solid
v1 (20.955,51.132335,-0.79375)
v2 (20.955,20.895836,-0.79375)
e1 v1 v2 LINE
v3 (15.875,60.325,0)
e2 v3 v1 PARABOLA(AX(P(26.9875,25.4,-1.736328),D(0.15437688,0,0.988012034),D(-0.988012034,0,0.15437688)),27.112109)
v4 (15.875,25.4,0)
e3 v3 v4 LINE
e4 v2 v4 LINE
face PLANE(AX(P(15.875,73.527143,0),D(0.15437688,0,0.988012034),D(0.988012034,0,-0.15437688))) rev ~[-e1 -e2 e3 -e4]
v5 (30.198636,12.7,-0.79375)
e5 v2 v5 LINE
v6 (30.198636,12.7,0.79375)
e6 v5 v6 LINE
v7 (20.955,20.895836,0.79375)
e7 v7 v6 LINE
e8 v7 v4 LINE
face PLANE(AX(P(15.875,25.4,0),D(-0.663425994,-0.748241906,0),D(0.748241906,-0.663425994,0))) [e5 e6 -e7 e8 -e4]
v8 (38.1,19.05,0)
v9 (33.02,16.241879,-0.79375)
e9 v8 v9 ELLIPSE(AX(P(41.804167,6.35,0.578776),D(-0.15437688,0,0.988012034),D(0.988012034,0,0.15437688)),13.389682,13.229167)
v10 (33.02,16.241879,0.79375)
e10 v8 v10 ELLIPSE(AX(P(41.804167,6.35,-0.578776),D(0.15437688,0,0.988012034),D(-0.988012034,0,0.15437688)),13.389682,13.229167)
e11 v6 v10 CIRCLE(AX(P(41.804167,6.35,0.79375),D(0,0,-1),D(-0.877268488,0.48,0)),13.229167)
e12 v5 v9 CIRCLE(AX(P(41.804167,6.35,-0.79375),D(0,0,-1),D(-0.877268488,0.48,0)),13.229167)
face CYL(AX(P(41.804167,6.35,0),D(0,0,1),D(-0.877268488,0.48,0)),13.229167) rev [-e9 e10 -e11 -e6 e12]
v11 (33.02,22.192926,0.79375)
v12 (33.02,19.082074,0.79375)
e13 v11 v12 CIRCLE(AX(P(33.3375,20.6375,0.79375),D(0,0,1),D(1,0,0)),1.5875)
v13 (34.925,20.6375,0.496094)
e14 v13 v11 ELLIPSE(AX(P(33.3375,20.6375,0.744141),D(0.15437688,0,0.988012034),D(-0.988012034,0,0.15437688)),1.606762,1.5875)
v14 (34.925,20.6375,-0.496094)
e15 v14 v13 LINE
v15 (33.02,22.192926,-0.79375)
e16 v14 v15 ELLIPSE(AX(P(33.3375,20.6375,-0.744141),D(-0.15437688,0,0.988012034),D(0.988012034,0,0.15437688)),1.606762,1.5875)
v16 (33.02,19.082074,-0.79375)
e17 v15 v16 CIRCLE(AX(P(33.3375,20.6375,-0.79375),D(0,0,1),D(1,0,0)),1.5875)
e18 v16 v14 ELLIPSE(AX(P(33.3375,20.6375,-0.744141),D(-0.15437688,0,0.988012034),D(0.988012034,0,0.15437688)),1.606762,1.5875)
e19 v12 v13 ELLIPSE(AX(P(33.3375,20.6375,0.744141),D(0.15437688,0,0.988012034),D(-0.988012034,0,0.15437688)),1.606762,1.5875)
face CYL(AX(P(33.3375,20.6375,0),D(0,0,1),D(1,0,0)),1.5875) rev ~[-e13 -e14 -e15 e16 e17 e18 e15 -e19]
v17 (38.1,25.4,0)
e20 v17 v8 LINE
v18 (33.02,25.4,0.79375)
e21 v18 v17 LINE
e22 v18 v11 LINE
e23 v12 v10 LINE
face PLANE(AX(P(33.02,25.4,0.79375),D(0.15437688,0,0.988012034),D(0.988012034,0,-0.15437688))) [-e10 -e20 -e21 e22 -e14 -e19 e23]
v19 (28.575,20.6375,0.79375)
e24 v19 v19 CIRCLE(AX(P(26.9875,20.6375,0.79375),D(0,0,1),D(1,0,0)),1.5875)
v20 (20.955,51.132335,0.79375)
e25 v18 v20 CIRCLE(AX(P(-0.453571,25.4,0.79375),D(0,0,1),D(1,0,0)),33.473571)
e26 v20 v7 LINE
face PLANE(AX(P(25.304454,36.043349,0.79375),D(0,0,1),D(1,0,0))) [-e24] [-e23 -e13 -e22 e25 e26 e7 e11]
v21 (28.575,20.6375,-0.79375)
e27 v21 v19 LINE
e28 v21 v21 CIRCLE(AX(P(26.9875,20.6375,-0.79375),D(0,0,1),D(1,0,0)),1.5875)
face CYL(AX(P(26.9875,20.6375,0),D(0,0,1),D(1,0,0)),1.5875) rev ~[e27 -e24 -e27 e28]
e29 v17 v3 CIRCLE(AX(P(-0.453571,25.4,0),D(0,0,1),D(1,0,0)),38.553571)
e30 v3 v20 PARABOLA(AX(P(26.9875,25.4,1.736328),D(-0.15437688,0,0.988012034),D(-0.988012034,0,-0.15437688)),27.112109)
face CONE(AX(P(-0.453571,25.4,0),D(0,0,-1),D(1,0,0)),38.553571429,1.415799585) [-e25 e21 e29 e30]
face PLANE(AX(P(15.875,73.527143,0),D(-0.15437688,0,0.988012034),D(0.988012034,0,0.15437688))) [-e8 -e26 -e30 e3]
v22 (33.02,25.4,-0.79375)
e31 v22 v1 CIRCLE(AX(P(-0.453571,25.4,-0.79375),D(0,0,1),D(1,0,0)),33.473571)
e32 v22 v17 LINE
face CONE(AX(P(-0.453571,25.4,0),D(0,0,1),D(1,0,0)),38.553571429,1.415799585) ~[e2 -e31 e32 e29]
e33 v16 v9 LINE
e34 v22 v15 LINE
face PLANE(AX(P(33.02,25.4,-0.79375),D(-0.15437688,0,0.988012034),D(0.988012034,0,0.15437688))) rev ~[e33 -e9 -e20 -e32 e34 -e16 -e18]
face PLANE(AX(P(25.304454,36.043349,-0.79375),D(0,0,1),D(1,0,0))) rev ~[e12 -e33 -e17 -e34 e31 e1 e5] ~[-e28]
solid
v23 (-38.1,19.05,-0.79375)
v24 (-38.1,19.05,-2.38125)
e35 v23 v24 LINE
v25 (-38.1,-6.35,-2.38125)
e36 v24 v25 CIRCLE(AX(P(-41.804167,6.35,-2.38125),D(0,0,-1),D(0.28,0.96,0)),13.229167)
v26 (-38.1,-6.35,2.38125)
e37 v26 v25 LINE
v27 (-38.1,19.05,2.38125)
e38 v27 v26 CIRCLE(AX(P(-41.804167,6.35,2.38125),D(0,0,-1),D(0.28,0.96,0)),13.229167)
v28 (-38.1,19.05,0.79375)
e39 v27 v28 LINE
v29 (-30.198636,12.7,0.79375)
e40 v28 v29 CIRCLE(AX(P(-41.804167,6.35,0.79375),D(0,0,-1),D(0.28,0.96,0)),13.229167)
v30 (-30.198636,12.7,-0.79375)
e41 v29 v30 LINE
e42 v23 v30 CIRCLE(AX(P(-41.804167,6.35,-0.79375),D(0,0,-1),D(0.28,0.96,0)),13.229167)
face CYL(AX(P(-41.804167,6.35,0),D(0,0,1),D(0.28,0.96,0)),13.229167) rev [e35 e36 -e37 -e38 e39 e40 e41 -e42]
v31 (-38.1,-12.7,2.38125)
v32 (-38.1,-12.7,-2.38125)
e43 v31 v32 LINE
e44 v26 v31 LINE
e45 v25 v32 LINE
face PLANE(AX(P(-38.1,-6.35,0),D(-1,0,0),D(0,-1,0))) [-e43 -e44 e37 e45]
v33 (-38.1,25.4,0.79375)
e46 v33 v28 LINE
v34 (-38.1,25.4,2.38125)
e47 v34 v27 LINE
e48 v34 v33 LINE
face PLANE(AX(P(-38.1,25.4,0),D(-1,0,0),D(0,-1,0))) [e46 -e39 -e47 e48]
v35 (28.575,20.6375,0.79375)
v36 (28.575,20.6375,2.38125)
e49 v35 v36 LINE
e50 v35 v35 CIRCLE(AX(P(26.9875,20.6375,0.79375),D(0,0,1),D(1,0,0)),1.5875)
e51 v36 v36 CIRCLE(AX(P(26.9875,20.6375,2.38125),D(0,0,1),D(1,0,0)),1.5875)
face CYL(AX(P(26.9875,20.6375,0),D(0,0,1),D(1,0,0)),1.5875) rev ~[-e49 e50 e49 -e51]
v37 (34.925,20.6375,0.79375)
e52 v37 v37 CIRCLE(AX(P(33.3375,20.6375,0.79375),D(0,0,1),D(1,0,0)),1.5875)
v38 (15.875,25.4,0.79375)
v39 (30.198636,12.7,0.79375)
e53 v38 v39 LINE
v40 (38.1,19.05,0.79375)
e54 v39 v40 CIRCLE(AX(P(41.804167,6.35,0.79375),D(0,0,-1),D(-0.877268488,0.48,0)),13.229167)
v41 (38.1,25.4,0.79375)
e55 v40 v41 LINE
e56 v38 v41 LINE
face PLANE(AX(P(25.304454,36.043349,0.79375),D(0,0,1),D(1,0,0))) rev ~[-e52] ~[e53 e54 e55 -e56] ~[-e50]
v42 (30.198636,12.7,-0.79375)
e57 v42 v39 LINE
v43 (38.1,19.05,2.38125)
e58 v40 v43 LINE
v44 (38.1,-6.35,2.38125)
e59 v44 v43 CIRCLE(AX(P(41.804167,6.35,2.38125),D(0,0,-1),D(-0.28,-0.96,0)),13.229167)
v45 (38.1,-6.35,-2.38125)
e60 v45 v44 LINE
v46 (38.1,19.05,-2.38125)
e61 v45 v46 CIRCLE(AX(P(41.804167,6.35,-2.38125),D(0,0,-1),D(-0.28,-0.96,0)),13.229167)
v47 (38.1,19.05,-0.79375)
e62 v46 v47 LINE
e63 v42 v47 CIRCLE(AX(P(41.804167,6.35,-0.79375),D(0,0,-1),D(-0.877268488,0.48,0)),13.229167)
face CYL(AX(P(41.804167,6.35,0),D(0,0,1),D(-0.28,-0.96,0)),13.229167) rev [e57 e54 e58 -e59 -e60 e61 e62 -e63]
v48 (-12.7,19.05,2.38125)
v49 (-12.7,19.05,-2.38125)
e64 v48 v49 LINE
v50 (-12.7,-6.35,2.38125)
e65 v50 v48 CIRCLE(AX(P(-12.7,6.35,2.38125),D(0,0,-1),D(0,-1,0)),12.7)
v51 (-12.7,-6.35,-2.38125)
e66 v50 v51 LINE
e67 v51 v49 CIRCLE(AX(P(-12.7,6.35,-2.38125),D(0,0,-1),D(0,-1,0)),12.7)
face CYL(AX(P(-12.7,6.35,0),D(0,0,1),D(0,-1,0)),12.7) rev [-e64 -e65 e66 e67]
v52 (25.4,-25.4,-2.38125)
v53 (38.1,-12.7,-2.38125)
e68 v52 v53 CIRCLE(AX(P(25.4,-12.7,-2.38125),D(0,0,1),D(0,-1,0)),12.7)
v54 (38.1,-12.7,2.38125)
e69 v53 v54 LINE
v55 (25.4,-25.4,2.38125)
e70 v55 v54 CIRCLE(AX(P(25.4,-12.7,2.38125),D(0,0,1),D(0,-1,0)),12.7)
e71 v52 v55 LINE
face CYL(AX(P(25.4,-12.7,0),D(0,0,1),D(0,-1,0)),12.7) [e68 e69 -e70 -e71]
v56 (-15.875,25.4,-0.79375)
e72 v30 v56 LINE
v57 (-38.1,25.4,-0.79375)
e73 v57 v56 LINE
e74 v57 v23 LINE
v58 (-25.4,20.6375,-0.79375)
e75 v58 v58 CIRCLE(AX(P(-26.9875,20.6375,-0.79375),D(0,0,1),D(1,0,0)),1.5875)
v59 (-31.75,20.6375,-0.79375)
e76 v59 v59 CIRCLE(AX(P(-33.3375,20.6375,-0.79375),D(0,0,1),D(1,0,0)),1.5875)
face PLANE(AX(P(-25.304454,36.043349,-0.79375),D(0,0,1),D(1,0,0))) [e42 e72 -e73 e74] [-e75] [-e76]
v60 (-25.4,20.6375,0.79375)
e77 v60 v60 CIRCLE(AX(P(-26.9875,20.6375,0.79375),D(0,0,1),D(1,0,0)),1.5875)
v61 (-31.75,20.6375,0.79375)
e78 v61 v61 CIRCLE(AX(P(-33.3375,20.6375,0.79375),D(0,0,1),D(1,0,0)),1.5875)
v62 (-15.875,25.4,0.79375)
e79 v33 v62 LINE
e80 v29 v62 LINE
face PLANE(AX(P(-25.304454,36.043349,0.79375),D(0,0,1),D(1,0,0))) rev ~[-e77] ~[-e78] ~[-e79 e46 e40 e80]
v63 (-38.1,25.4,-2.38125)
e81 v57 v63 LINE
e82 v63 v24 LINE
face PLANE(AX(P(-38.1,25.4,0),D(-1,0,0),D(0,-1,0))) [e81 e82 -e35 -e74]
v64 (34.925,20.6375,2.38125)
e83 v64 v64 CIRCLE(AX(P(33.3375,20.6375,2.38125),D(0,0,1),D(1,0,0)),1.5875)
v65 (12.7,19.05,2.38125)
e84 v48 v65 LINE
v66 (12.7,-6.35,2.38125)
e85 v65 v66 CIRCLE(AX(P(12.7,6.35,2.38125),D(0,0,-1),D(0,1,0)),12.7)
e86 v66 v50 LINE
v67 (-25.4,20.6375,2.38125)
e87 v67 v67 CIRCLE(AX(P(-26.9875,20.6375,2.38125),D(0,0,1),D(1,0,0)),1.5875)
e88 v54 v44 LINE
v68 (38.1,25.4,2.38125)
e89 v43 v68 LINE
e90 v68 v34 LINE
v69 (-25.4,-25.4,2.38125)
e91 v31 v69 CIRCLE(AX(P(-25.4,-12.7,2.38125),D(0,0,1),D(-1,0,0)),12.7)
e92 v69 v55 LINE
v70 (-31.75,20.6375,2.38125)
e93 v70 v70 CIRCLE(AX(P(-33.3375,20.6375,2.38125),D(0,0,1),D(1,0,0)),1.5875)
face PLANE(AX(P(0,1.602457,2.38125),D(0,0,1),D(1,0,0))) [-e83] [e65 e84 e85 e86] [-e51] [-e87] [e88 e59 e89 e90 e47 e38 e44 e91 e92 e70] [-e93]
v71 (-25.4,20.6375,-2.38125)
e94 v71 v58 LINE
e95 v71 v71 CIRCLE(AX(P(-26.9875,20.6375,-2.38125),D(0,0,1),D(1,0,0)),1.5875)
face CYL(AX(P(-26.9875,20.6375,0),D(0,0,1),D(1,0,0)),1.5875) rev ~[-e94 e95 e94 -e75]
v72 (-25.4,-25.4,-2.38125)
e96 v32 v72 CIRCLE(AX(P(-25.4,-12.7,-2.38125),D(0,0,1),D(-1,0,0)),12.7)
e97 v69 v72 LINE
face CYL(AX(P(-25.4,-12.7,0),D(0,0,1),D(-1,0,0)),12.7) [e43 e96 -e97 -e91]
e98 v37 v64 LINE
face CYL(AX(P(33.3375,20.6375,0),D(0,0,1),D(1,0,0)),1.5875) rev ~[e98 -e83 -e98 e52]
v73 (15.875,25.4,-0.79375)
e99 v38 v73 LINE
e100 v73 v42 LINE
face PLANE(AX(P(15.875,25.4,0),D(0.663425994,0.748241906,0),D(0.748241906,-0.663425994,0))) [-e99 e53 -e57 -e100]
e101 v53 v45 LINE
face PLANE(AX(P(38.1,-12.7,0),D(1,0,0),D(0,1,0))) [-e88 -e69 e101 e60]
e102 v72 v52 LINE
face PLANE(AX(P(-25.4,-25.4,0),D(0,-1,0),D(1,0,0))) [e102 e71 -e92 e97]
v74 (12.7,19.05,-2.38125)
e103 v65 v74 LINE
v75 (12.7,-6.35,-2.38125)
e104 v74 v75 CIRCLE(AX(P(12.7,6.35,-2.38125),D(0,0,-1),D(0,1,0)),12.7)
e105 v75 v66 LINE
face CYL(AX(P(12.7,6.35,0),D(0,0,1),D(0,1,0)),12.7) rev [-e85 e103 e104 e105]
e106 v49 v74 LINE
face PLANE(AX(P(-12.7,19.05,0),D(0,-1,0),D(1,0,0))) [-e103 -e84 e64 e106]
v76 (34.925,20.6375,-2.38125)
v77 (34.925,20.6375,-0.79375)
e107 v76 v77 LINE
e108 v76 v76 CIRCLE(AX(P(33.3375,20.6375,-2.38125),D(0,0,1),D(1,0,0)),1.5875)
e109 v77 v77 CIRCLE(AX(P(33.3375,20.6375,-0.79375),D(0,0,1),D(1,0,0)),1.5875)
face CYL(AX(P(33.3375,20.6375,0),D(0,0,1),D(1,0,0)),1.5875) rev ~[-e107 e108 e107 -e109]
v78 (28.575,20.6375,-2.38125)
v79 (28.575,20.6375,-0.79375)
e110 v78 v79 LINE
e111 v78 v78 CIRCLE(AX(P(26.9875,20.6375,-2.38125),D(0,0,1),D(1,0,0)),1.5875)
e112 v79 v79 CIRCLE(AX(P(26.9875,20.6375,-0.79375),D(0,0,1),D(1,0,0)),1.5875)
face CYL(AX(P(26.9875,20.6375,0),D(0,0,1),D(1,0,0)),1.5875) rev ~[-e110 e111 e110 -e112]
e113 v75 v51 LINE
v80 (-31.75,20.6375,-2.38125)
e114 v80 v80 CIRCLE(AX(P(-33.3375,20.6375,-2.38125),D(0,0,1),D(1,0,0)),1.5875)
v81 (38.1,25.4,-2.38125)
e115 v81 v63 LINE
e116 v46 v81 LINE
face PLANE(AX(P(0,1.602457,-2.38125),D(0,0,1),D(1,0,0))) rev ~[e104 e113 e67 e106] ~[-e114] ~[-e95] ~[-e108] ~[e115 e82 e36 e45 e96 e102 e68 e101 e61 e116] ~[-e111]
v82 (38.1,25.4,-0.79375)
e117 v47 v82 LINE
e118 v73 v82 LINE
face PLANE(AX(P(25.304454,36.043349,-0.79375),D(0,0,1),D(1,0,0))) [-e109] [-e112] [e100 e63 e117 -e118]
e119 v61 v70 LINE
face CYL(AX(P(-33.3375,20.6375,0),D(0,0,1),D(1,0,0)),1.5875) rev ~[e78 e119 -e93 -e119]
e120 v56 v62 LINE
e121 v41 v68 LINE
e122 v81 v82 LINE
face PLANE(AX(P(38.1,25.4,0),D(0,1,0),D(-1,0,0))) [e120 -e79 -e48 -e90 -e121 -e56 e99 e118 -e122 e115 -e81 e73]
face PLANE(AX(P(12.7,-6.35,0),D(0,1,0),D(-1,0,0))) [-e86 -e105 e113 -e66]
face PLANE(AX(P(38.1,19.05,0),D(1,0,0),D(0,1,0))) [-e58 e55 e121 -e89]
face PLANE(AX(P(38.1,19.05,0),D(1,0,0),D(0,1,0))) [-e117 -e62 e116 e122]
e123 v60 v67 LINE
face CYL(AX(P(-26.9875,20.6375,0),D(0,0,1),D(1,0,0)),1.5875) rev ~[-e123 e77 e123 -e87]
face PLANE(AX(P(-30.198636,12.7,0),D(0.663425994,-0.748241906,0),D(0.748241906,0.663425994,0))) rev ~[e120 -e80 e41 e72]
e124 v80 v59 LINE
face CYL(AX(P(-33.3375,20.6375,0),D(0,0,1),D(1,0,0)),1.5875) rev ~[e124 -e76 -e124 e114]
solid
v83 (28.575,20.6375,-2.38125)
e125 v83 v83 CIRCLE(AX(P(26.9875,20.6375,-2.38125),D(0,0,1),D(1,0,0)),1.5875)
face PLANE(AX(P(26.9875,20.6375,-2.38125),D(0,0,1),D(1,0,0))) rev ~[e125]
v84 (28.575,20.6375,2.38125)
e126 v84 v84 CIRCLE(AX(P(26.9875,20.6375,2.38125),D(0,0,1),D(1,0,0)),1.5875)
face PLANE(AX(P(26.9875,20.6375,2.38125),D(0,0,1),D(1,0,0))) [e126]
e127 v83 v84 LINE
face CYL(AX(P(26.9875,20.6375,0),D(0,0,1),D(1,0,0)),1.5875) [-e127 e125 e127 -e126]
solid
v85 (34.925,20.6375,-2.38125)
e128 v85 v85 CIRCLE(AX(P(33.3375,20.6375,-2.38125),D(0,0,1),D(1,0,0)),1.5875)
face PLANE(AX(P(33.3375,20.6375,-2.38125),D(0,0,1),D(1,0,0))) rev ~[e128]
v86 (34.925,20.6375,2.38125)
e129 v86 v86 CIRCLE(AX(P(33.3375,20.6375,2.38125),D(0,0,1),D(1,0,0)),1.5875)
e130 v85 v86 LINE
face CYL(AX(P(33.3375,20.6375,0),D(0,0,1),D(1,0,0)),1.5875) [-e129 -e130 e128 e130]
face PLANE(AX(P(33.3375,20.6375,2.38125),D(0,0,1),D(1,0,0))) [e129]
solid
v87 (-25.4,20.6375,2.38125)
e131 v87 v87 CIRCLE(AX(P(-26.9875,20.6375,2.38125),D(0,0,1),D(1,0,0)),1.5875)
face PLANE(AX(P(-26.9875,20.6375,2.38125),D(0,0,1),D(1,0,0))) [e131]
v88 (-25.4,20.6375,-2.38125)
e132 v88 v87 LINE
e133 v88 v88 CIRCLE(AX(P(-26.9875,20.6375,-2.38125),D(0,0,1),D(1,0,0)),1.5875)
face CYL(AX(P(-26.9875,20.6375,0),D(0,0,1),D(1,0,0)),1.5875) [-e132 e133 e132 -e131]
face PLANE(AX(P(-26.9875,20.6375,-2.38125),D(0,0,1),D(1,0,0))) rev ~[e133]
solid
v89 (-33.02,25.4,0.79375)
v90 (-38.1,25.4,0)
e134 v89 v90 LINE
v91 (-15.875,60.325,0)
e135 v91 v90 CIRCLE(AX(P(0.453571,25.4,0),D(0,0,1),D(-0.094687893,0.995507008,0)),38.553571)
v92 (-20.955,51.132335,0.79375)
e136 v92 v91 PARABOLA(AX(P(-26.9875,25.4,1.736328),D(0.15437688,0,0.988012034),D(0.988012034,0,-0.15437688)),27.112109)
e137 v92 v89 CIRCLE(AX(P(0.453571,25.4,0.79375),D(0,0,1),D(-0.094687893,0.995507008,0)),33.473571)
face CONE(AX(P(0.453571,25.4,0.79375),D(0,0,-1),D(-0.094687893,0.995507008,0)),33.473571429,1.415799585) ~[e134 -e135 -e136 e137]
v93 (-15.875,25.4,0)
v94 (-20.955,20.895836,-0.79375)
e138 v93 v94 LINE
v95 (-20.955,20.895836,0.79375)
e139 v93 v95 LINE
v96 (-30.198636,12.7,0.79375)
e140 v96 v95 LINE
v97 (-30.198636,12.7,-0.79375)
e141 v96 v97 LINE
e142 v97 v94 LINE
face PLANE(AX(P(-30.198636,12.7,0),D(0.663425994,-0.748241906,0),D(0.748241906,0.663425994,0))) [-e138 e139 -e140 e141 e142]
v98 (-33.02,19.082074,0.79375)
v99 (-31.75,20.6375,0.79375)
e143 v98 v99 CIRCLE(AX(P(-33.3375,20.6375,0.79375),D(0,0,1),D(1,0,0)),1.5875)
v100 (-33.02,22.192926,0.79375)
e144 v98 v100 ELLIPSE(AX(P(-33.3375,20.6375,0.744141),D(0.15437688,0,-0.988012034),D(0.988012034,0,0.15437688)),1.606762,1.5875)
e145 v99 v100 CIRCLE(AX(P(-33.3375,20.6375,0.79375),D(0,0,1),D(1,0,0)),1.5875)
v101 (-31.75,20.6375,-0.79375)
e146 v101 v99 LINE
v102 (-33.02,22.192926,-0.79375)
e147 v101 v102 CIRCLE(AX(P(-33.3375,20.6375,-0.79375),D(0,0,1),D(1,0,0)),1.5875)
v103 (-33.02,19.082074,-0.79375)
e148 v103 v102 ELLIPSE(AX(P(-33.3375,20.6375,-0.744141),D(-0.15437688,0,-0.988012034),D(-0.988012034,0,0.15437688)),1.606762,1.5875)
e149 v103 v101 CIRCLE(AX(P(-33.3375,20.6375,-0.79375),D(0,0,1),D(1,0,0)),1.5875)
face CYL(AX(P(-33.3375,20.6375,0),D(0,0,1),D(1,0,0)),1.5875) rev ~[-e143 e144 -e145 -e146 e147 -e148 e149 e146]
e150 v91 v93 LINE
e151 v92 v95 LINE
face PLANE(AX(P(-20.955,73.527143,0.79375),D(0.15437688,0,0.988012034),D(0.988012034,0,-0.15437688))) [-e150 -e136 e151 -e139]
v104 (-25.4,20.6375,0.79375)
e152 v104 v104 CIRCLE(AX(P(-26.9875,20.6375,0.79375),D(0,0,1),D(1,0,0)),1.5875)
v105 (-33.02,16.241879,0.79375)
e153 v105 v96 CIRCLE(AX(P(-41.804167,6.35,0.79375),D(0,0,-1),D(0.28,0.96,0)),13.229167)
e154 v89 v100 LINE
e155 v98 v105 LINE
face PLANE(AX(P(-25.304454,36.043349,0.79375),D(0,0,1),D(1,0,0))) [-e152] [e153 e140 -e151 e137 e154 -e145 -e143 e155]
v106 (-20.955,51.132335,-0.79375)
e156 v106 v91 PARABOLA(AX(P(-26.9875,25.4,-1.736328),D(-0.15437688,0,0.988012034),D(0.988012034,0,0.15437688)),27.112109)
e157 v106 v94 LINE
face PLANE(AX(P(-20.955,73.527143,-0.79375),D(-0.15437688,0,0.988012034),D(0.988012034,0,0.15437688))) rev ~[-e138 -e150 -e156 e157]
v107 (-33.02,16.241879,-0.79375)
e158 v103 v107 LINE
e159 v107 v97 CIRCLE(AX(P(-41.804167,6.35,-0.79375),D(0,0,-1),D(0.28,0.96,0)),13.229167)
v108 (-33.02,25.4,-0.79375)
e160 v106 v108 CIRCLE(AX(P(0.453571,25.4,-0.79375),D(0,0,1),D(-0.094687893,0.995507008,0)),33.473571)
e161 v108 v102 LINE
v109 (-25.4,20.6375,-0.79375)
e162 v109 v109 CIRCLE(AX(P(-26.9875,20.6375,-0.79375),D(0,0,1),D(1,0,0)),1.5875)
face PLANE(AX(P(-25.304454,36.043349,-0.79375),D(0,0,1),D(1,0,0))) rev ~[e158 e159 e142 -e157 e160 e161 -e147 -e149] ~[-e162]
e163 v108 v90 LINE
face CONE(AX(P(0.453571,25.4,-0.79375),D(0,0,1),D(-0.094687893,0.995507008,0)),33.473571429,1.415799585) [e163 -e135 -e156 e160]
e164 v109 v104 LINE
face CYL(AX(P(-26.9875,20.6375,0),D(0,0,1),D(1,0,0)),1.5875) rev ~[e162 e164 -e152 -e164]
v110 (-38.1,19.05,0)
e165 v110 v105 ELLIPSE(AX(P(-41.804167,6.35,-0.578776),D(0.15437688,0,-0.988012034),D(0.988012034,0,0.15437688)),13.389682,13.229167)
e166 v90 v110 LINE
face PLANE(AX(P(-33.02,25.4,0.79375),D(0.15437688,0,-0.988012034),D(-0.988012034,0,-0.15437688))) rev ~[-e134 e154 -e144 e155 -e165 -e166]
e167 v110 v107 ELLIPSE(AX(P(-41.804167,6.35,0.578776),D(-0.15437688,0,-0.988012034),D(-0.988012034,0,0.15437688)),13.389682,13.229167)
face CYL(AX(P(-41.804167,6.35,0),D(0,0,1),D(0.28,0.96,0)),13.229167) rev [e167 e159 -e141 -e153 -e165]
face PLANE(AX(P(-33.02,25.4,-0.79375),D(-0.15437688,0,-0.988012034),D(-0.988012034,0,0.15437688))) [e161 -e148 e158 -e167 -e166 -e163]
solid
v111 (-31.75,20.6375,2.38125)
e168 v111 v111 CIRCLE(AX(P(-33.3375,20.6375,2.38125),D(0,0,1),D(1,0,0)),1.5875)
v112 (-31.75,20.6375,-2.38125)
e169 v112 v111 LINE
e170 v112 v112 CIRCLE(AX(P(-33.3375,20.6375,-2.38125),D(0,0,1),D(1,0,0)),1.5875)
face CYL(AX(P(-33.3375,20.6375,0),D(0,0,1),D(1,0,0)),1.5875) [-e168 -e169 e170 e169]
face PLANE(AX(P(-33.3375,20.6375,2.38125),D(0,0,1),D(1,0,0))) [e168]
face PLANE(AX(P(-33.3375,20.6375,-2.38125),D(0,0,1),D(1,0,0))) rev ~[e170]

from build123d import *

# Parameters (mm, degrees)
F1_DEPTH      = 2.38125
F1_DEPTH_BACK = 2.38125
F3_DEPTH      = 0.79375
F3_DEPTH_BACK = 0.79375
F4_DEPTH      = 0.79375
F4_DEPTH_BACK = 0.79375
F5_R          = 1.5875
F6_DEPTH      = 2.38125
F6_DEPTH_BACK = 2.38125
F7_DEPTH      = 2.38125
F7_DEPTH_BACK = 2.38125
F8_T1_DEPTH   = 61.3292860819
F8_T3_DEPTH   = 19.552143041
F8_T6_ANGLE   = 84.5666435794
F8_2_T1_DEPTH = 61.3292860819
F8_2_T3_DEPTH = 19.552143041
F8_2_T6_ANGLE = 84.5666435794
F9_T1_DEPTH   = 61.3292860819
F9_T3_DEPTH   = 19.552143041
F9_T6_ANGLE   = 84.5666435794
F9_2_T1_DEPTH = 61.3292860819
F9_2_T3_DEPTH = 19.552143041
F9_2_T6_ANGLE = 84.5666435794


# Not quite as in the source:
# - a fillet or chamfer that OpenCascade refuses, or shapes differently, is made with other operations: its cross-section is extruded or revolved along the edge and cut away or added


with BuildPart() as f1:
    # F0 (on Top) → F1 (new body, two sides)
    with BuildSketch(Plane.XY) as f1_sk:
        with BuildLine():
            Line((-25.4, -25.4), (25.4, -25.4))
            ThreePointArc((25.4, -25.4), (34.3802561211, -21.6802561211), (38.1, -12.7))
            Line((38.1, -12.7), (38.1, -6.35))
            ThreePointArc((38.1, -6.35), (28.575, 6.35), (38.1, 19.05))
            Line((38.1, 19.05), (38.1, 25.4))
            Line((38.1, 25.4), (-38.1, 25.4))
            Line((-38.1, 25.4), (-38.1, 19.05))
            ThreePointArc((-38.1, 19.05), (-28.575, 6.35), (-38.1, -6.35))
            Line((-38.1, -6.35), (-38.1, -12.7))
            ThreePointArc((-38.1, -12.7), (-34.3802561211, -21.6802561211), (-25.4, -25.4))
        make_face()
        with BuildLine():
            Line((12.7, -6.35), (-12.7, -6.35))
            ThreePointArc((-12.7, -6.35), (-25.4, 6.35), (-12.7, 19.05))
            Line((-12.7, 19.05), (12.7, 19.05))
            ThreePointArc((12.7, 19.05), (25.4, 6.35), (12.7, -6.35))
        make_face(mode=Mode.SUBTRACT)
    extrude(amount=F1_DEPTH)
    extrude(f1_sk.sketch, amount=-F1_DEPTH_BACK)

    # F2 (on Top) → F3 (cut, two sides)
    with BuildSketch(Plane.XY) as f3_sk:
        with BuildLine():
            ThreePointArc((-15.875, 60.325), (-32.0725920002, 46.0984676365), (-38.1, 25.4))
            Line((-38.1, 25.4), (-38.1, 19.05))
            ThreePointArc((-38.1, 19.05), (-33.5169876558, 16.661814328), (-30.1986356278, 12.7))
            Line((-30.1986356278, 12.7), (-15.875, 25.4))
            Line((-15.875, 25.4), (-15.875, 60.325))
        make_face()
        with BuildLine():
            Line((15.875, 60.325), (15.875, 25.4))
            Line((15.875, 25.4), (30.1986356278, 12.7))
            ThreePointArc((30.1986356278, 12.7), (33.5169876558, 16.661814328), (38.1, 19.05))
            Line((38.1, 19.05), (38.1, 25.4))
            ThreePointArc((38.1, 25.4), (32.0725920002, 46.0984676365), (15.875, 60.325))
        make_face()
    extrude(amount=F3_DEPTH, mode=Mode.SUBTRACT)
    extrude(f3_sk.sketch, amount=-F3_DEPTH_BACK, mode=Mode.SUBTRACT)


with BuildPart() as f4:
    # F2 (on Top) → F4 (new body, two sides)
    with BuildSketch(Plane.XY) as f4_sk:
        with BuildLine():
            Line((15.875, 60.325), (15.875, 25.4))
            Line((15.875, 25.4), (30.1986356278, 12.7))
            ThreePointArc((30.1986356278, 12.7), (33.5169876558, 16.661814328), (38.1, 19.05))
            Line((38.1, 19.05), (38.1, 25.4))
            ThreePointArc((38.1, 25.4), (32.0725920002, 46.0984676365), (15.875, 60.325))
        make_face()
    extrude(amount=F4_DEPTH)
    extrude(f4_sk.sketch, amount=-F4_DEPTH_BACK)


with BuildPart() as f4b:
    # F2 (on Top) → F4, piece 2 (new body, two sides)
    with BuildSketch(Plane.XY) as f4_2_sk:
        with BuildLine():
            ThreePointArc((-15.875, 60.325), (-32.0725920002, 46.0984676365), (-38.1, 25.4))
            Line((-38.1, 25.4), (-38.1, 19.05))
            ThreePointArc((-38.1, 19.05), (-33.5169876558, 16.661814328), (-30.1986356278, 12.7))
            Line((-30.1986356278, 12.7), (-15.875, 25.4))
            Line((-15.875, 25.4), (-15.875, 60.325))
        make_face()
    extrude(amount=F4_DEPTH)
    extrude(f4_2_sk.sketch, amount=-F4_DEPTH_BACK)


with BuildPart() as f6_tool:
    # F5 (on Top) → F6 (new body, two sides)
    with BuildSketch(Plane.XY) as f6_sk:
        with Locations((-26.9875, 20.6375)):
            Circle(F5_R)
        with Locations((26.9875, 20.6375)):
            Circle(F5_R)
        with Locations((-33.3375, 20.6375)):
            Circle(F5_R)
        with Locations((33.3375, 20.6375)):
            Circle(F5_R)
    extrude(amount=F6_DEPTH)
    extrude(f6_sk.sketch, amount=-F6_DEPTH_BACK)


with BuildPart() as f1_1:
    add(f1.part)

    # F6: cut by f6_tool
    add(f6_tool.part, mode=Mode.SUBTRACT)


with BuildPart() as f4_1:
    add(f4.part)

    # F6: cut by f6_tool
    add(f6_tool.part, mode=Mode.SUBTRACT)

    # F8: chamfer of 0.79375 x 5.08 on 2 edges, made by hand

    # F8_s2 → F8_t1 (cut)
    with BuildSketch(Plane.XZ.offset(-73.527143041)):
        Polygon((15.875, 0), (20.955, 0.79375), (15.875, 0.79375), align=None)
    extrude(amount=F8_T1_DEPTH, mode=Mode.SUBTRACT)

    # F8_s4 → F8_t3 (cut)
    with BuildSketch(Plane.XZ.offset(-25.4)):
        Polygon((33.02, 0.79375), (38.1, 0), (38.1, 0.79375), align=None)
    extrude(amount=F8_T3_DEPTH, mode=Mode.SUBTRACT)

    # F8_s5 → F8_t6 (revolve, cut)
    with BuildSketch(Plane.XZ.offset(-25.4)):
        Polygon((38.1, 0), (33.02, 0.79375), (38.1, 0.79375), align=None)
    revolve(axis=Axis((-0.4535714286, 25.4, 0.79375), (0, 0, 1)), revolution_arc=F8_T6_ANGLE, mode=Mode.SUBTRACT)

    # F9: chamfer of 0.79375 x 5.08 on 2 edges, made by hand

    # F9_s2 → F9_t1 (cut)
    with BuildSketch(Plane.XZ.offset(-73.527143041)):
        Polygon((15.875, 0), (20.955, -0.79375), (15.875, -0.79375), align=None)
    extrude(amount=F9_T1_DEPTH, mode=Mode.SUBTRACT)

    # F9_s4 → F9_t3 (cut)
    with BuildSketch(Plane.XZ.offset(-25.4)):
        Polygon((33.02, -0.79375), (38.1, 0), (38.1, -0.79375), align=None)
    extrude(amount=F9_T3_DEPTH, mode=Mode.SUBTRACT)

    # F9_s5 → F9_t6 (revolve, cut)
    with BuildSketch(Plane.XZ.offset(-25.4)):
        Polygon((38.1, 0), (33.02, -0.79375), (38.1, -0.79375), align=None)
    revolve(axis=Axis((-0.4535714286, 25.4, -0.79375), (0, 0, 1)), revolution_arc=F9_T6_ANGLE, mode=Mode.SUBTRACT)


with BuildPart() as f4b_1:
    add(f4b.part)

    # F6: cut by f6_tool
    add(f6_tool.part, mode=Mode.SUBTRACT)

    # F8#2: chamfer of 0.79375 x 5.08 on 2 edges, made by hand

    # F8_2_s2 → F8_2_t1 (cut)
    with BuildSketch(Plane.XZ.offset(-73.527143041)):
        Polygon((-20.955, 0.79375), (-15.875, 0), (-15.875, 0.79375), align=None)
    extrude(amount=F8_2_T1_DEPTH, mode=Mode.SUBTRACT)

    # F8_2_s4 → F8_2_t3 (cut)
    with BuildSketch(Plane.XZ.offset(-25.4)):
        Polygon((-33.02, 0.79375), (-38.1, 0), (-38.1, 0.79375), align=None)
    extrude(amount=F8_2_T3_DEPTH, mode=Mode.SUBTRACT)

    # F8_2_s5 → F8_2_t6 (revolve, cut)
    with BuildSketch(Plane(origin=(2.8437713092, 0.2704860048, 0), x_dir=(0, 0, 1), z_dir=(0.995507008, 0.094687893, 0))):
        Polygon((0.79375, -58.7165017082), (0, -63.7965017082), (0.79375, -63.7965017082), align=None)
    revolve(axis=Axis((0.4535714286, 25.4, 0.79375), (0, 0, 1)), revolution_arc=F8_2_T6_ANGLE, mode=Mode.SUBTRACT)

    # F9#2: chamfer of 0.79375 x 5.08 on 2 edges, made by hand

    # F9_2_s2 → F9_2_t1 (cut)
    with BuildSketch(Plane.XZ.offset(-73.527143041)):
        Polygon((-20.955, -0.79375), (-15.875, 0), (-15.875, -0.79375), align=None)
    extrude(amount=F9_2_T1_DEPTH, mode=Mode.SUBTRACT)

    # F9_2_s4 → F9_2_t3 (cut)
    with BuildSketch(Plane.XZ.offset(-25.4)):
        Polygon((-33.02, -0.79375), (-38.1, 0), (-38.1, -0.79375), align=None)
    extrude(amount=F9_2_T3_DEPTH, mode=Mode.SUBTRACT)

    # F9_2_s5 → F9_2_t6 (revolve, cut)
    with BuildSketch(Plane(origin=(2.8437713092, 0.2704860048, 0), x_dir=(0, 0, 1), z_dir=(0.995507008, 0.094687893, 0))):
        Polygon((-0.79375, -58.7165017082), (0, -63.7965017082), (-0.79375, -63.7965017082), align=None)
    revolve(axis=Axis((0.4535714286, 25.4, -0.79375), (0, 0, 1)), revolution_arc=F9_2_T6_ANGLE, mode=Mode.SUBTRACT)


with BuildPart() as f7:
    # F5 (on Top) → F7 (new body, two sides)
    with BuildSketch(Plane.XY) as f7_sk:
        with Locations((-33.3375, 20.6375)):
            Circle(F5_R)
    extrude(amount=F7_DEPTH)
    extrude(f7_sk.sketch, amount=-F7_DEPTH_BACK)


with BuildPart() as f7b:
    # F5 (on Top) → F7, piece 2 (new body, two sides)
    with BuildSketch(Plane.XY) as f7_2_sk:
        with Locations((-26.9875, 20.6375)):
            Circle(F5_R)
    extrude(amount=F7_DEPTH)
    extrude(f7_2_sk.sketch, amount=-F7_DEPTH_BACK)


with BuildPart() as f7c:
    # F5 (on Top) → F7, piece 3 (new body, two sides)
    with BuildSketch(Plane.XY) as f7_3_sk:
        with Locations((26.9875, 20.6375)):
            Circle(F5_R)
    extrude(amount=F7_DEPTH)
    extrude(f7_3_sk.sketch, amount=-F7_DEPTH_BACK)


with BuildPart() as f7d:
    # F5 (on Top) → F7, piece 4 (new body, two sides)
    with BuildSketch(Plane.XY) as f7_4_sk:
        with Locations((33.3375, 20.6375)):
            Circle(F5_R)
    extrude(amount=F7_DEPTH)
    extrude(f7_4_sk.sketch, amount=-F7_DEPTH_BACK)


solid = Compound([f1_1.part, f4_1.part, f4b_1.part, f7.part, f7b.part, f7c.part, f7d.part])
